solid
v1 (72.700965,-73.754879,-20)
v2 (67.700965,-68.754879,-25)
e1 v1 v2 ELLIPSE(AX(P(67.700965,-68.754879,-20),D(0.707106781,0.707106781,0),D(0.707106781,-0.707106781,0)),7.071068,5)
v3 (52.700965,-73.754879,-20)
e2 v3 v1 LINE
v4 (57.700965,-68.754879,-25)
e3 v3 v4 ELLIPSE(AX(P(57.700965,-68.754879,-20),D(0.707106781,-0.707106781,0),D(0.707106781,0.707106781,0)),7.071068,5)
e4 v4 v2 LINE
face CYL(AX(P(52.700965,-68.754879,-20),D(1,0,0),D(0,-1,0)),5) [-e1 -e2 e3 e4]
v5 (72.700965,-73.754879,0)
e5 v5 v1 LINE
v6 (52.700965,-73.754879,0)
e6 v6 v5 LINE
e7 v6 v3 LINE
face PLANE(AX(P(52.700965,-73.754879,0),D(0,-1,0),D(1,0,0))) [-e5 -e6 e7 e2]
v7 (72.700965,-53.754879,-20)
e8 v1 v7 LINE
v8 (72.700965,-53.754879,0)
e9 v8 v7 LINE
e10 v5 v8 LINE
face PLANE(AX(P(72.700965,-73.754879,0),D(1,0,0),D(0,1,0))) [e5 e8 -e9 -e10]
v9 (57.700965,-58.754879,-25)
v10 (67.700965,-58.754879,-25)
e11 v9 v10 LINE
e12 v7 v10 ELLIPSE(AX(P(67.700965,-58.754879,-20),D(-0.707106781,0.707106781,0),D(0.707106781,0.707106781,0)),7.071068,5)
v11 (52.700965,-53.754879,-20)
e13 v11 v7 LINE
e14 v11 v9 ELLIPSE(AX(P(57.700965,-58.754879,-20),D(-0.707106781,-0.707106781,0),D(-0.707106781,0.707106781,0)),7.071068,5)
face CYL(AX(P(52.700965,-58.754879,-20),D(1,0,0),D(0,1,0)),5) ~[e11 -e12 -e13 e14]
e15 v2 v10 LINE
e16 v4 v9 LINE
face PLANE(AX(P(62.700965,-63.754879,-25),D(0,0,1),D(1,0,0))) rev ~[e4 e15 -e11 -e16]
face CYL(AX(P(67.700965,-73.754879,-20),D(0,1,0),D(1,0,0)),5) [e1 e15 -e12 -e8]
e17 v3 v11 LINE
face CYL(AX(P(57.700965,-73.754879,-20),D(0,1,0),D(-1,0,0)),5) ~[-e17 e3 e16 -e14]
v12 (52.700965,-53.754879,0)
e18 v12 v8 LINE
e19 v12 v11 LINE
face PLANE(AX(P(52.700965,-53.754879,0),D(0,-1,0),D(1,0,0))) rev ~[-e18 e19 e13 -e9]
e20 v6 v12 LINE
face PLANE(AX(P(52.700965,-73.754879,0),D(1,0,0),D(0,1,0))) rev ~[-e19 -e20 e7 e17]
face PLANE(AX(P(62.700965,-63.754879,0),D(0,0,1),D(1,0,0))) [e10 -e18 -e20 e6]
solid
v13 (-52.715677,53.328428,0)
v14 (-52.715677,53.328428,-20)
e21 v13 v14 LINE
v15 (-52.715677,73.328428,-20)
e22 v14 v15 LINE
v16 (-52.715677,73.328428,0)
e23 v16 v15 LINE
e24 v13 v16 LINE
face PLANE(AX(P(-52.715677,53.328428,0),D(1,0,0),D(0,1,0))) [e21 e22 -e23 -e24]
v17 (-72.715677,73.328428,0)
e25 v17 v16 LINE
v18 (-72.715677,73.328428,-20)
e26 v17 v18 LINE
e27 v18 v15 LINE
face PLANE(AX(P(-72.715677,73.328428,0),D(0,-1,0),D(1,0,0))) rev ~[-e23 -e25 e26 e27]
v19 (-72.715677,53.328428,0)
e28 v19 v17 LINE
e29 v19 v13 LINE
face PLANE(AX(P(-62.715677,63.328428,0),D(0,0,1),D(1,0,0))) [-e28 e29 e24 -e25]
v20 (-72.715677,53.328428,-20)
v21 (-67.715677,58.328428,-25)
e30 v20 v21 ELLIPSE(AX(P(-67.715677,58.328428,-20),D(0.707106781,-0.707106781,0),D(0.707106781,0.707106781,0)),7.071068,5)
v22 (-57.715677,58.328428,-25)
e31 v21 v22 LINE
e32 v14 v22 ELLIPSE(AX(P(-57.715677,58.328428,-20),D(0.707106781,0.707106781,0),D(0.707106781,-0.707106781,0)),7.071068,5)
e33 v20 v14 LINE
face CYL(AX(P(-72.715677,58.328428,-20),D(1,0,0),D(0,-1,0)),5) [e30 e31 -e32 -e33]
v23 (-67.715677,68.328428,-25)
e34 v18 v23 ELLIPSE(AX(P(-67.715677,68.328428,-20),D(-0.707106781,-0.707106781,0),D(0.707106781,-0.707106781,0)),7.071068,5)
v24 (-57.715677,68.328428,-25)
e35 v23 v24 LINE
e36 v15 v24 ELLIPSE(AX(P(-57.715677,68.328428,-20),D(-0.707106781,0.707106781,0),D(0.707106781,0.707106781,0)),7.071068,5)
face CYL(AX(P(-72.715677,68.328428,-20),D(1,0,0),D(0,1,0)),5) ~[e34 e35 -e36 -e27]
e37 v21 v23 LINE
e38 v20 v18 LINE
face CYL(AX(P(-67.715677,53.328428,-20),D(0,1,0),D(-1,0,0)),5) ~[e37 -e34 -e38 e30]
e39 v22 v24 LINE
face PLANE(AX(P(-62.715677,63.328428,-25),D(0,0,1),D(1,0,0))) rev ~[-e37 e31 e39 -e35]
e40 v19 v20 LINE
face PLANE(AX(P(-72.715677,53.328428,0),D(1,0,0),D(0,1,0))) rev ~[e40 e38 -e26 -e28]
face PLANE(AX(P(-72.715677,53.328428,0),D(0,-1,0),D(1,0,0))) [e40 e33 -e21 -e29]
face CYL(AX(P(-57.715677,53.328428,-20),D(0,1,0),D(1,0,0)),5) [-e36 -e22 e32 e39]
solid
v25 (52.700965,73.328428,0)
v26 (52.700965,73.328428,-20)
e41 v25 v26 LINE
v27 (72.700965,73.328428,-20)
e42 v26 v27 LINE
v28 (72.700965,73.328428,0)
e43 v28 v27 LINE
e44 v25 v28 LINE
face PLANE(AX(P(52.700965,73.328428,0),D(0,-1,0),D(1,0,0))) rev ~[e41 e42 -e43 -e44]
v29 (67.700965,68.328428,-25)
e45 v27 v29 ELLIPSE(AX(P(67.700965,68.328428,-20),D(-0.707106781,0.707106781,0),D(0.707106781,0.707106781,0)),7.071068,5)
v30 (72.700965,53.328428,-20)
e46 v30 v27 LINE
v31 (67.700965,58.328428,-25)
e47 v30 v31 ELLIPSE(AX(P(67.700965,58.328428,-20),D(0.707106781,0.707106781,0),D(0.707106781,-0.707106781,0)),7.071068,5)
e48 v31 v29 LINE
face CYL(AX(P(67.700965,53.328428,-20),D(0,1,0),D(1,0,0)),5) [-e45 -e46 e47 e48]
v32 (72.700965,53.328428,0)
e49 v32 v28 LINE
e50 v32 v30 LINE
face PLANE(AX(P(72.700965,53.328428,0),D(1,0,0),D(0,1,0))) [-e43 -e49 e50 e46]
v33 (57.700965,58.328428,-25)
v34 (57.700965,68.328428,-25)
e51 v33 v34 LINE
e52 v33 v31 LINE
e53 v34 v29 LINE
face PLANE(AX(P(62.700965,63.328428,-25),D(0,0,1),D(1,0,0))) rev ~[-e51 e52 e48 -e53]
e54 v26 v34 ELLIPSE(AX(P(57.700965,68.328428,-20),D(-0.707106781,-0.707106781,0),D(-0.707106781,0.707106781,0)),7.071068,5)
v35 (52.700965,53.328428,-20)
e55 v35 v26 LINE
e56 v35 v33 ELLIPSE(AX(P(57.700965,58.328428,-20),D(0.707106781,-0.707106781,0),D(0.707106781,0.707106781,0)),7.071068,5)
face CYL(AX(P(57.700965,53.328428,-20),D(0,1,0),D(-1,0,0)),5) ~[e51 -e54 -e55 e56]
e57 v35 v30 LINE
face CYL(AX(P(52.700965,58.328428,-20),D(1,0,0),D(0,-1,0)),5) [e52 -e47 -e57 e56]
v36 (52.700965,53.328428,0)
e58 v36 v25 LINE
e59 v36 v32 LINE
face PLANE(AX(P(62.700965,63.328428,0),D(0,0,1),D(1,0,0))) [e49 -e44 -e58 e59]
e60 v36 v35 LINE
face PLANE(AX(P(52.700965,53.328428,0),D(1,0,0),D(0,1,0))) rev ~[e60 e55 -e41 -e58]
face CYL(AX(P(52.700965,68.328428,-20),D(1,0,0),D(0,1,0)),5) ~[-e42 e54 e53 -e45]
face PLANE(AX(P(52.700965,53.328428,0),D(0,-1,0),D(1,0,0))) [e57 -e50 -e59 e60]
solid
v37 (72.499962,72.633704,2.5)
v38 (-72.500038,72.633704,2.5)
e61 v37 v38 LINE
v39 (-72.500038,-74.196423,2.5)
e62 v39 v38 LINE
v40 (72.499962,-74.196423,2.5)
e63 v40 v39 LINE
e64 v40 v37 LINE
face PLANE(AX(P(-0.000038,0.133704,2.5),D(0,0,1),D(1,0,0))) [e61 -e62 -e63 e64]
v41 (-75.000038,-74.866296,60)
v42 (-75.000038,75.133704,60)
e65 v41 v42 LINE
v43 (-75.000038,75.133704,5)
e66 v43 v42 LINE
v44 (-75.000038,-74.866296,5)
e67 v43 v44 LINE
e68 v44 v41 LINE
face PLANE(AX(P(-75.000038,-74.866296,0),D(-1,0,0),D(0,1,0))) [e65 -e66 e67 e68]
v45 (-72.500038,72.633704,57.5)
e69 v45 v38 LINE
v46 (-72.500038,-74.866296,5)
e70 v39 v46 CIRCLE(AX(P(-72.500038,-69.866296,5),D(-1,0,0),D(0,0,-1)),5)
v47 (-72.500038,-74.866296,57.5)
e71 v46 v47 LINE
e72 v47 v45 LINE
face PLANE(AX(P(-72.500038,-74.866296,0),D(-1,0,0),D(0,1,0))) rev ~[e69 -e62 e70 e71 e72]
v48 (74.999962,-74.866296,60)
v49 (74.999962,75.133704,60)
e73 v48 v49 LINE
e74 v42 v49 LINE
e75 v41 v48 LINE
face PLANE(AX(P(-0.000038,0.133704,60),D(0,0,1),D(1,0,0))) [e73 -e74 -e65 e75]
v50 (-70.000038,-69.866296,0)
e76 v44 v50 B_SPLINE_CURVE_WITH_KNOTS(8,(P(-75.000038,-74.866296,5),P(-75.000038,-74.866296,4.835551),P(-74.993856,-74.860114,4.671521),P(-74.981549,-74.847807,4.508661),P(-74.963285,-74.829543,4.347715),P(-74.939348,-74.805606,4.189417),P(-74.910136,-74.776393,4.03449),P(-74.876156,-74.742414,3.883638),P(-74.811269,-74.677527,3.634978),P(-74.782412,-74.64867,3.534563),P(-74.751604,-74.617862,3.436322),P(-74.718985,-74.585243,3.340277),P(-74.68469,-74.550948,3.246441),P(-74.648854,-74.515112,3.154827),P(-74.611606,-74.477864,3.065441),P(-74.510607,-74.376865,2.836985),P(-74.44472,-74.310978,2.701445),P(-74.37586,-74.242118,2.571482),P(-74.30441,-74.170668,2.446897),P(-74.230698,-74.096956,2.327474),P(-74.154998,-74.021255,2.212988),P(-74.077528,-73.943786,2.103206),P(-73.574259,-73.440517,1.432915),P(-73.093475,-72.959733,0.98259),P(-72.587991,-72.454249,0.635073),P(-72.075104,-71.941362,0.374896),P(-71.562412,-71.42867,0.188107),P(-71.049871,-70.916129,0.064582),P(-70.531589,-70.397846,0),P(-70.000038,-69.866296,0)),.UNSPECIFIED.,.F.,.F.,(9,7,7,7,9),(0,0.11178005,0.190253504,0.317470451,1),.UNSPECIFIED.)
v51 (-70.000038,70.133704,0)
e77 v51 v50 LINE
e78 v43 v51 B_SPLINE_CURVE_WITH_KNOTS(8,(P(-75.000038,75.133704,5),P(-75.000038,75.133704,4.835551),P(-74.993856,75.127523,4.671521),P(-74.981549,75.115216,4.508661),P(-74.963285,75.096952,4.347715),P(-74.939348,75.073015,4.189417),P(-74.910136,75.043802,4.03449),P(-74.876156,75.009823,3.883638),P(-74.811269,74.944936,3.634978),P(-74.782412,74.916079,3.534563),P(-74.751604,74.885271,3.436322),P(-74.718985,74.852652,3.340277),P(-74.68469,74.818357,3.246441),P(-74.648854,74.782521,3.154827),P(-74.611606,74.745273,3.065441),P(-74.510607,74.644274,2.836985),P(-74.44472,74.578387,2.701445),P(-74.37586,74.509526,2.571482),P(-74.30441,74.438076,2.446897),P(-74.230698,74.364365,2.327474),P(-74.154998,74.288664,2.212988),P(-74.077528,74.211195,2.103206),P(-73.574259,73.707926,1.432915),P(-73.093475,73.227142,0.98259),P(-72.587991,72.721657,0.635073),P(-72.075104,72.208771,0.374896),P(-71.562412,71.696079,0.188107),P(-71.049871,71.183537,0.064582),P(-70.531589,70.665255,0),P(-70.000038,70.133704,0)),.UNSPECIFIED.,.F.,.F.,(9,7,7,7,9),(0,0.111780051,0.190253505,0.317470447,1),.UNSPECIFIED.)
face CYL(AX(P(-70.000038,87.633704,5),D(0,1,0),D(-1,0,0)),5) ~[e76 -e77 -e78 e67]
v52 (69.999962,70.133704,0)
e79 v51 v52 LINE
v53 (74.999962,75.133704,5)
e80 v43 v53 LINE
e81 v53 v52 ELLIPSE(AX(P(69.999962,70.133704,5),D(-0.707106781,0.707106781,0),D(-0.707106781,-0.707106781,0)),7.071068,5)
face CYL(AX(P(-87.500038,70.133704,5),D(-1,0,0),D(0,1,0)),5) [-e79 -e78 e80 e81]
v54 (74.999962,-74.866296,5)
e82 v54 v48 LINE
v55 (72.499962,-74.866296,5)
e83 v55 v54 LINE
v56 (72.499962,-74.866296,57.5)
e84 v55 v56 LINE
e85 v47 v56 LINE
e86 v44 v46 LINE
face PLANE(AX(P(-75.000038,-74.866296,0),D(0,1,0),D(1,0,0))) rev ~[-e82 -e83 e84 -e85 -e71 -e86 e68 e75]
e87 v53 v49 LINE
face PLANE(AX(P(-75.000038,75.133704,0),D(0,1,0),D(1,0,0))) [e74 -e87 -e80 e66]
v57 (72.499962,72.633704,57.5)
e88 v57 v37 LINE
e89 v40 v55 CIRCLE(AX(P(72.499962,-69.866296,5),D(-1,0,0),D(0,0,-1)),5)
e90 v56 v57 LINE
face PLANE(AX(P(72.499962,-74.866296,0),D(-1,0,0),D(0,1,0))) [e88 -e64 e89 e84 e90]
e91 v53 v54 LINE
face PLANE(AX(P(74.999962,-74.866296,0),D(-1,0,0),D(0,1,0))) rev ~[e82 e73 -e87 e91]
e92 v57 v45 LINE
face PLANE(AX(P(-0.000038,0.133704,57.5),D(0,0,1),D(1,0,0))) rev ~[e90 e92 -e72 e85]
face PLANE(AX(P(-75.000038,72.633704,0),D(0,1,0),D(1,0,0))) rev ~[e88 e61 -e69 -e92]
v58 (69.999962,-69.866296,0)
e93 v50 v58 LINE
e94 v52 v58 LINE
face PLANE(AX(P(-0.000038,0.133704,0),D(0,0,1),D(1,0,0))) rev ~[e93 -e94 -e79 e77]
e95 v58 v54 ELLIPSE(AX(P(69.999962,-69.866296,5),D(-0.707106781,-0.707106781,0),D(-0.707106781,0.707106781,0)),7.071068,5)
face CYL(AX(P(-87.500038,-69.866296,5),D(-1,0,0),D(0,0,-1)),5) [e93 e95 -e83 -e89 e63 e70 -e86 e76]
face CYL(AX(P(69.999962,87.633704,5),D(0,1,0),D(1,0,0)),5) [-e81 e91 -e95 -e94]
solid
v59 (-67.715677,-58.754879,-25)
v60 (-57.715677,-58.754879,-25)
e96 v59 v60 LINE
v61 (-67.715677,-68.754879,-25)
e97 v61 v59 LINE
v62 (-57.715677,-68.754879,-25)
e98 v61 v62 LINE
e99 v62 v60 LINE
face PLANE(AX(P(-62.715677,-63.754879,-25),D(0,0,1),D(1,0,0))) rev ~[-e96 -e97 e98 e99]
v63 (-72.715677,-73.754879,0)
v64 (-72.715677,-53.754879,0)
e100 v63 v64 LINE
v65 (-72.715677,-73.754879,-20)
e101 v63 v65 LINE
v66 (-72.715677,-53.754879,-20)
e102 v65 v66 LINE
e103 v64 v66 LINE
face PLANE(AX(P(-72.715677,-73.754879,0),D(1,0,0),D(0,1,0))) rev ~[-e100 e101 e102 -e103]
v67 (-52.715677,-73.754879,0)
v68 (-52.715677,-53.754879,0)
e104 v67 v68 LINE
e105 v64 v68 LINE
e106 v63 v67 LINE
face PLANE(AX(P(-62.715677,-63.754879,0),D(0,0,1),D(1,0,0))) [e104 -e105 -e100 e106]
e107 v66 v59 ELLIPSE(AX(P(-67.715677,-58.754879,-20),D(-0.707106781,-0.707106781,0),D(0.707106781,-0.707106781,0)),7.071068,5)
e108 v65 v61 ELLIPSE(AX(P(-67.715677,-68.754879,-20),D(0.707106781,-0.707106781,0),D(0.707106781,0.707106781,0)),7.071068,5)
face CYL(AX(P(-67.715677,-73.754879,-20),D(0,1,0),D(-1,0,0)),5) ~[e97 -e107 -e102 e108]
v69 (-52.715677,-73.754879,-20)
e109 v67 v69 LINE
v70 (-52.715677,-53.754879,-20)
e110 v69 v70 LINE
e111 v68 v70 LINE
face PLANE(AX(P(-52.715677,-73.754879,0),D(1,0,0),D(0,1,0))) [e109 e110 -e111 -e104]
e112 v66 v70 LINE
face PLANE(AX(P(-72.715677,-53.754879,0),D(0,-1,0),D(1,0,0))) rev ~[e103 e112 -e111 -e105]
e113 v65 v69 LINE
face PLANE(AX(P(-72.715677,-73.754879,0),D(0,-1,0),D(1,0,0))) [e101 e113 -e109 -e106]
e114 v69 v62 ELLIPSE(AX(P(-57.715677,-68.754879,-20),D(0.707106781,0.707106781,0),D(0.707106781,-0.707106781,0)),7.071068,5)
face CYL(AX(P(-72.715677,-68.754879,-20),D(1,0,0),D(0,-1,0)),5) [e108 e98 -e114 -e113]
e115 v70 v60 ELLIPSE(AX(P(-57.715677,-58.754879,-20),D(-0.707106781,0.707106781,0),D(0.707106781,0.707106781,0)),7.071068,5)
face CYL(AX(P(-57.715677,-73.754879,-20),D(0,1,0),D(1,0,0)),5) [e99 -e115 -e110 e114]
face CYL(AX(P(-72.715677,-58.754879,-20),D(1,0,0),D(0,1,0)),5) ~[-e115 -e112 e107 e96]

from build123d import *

# Parameters (mm, degrees)
F0_W        = 20
F0_H        = 20
F1_DEPTH    = 25
F2_W        = 150
F2_H        = 150
F3_DEPTH    = 60
F4_T        = -2.5
F5_R        = 5
F5_2_R      = 5
F5_3_R      = 5
F5_4_R      = 5
F6_T1_DEPTH = 175
F6_T3_DEPTH = 175


# Not quite as in the source:
# - a fillet or chamfer that OpenCascade refuses, or shapes differently, is made with other operations: its cross-section is extruded or revolved along the edge and cut away or added


with BuildPart() as f1:
    # F0 (on Top) → F1 (new body)
    with BuildSketch(Plane.XY):
        with Locations((-62.7156771406, 63.3284281388)):
            Rectangle(F0_W, F0_H)
    extrude(amount=-F1_DEPTH)

    # F5#4
    f5_4_edges = [f1.edges().sort_by_distance(p)[0] for p in [
        (-62.715677, 73.328428, -25),
        (-72.715677, 63.328428, -25),
        (-62.715677, 53.328428, -25),
        (-52.715677, 63.328428, -25),
    ]]
    fillet(f5_4_edges, radius=F5_4_R)


with BuildPart() as f1b:
    # F0 (on Top) → F1, piece 2 (new body)
    with BuildSketch(Plane.XY):
        with Locations((-62.7156771406, -63.7548786509)):
            Rectangle(F0_W, F0_H)
    extrude(amount=-F1_DEPTH)

    # F5
    f5_edges = [f1b.edges().sort_by_distance(p)[0] for p in [
        (-62.715677, -53.754879, -25),
        (-72.715677, -63.754879, -25),
        (-62.715677, -73.754879, -25),
        (-52.715677, -63.754879, -25),
    ]]
    fillet(f5_edges, radius=F5_R)


with BuildPart() as f1c:
    # F0 (on Top) → F1, piece 3 (new body)
    with BuildSketch(Plane.XY):
        with Locations((62.7009654807, 63.3284281388)):
            Rectangle(F0_W, F0_H)
    extrude(amount=-F1_DEPTH)

    # F5#3
    f5_3_edges = [f1c.edges().sort_by_distance(p)[0] for p in [
        (52.700965, 63.328428, -25),
        (62.700965, 53.328428, -25),
        (72.700965, 63.328428, -25),
        (62.700965, 73.328428, -25),
    ]]
    fillet(f5_3_edges, radius=F5_3_R)


with BuildPart() as f1d:
    # F0 (on Top) → F1, piece 4 (new body)
    with BuildSketch(Plane.XY):
        with Locations((62.7009654807, -63.7548786509)):
            Rectangle(F0_W, F0_H)
    extrude(amount=-F1_DEPTH)

    # F5#2
    f5_2_edges = [f1d.edges().sort_by_distance(p)[0] for p in [
        (52.700965, -63.754879, -25),
        (62.700965, -73.754879, -25),
        (72.700965, -63.754879, -25),
        (62.700965, -53.754879, -25),
    ]]
    fillet(f5_2_edges, radius=F5_2_R)


with BuildPart() as f3:
    # F2 (on Top) → F3 (new body)
    with BuildSketch(Plane.XY):
        with Locations((-3.77863e-05, 0.1337043941)):
            Rectangle(F2_W, F2_H)
    extrude(amount=F3_DEPTH)

    # F4
    f4_openings = [f3.faces().sort_by_distance(p)[0] for p in [
        (-3.8e-05, -74.866296, 30),
    ]]
    offset(amount=F4_T, openings=f4_openings)

    # F6: fillet of radius 5 on 4 edges, made by hand

    # F6_s2 → F6_t1 (cut)
    with BuildSketch(Plane.YZ.offset(-87.5000377863)):
        with BuildLine():
            ThreePointArc((75.1337043941, 5), (73.6692383, 1.4644660941), (70.1337043941, 0))
            Line((70.1337043941, 0), (75.1337043941, 0))
            Line((75.1337043941, 0), (75.1337043941, 5))
        make_face()
        with BuildLine():
            ThreePointArc((-69.8662956059, 0), (-73.4018295118, 1.4644660941), (-74.8662956059, 5))
            Line((-74.8662956059, 5), (-74.8662956059, 0))
            Line((-74.8662956059, 0), (-69.8662956059, 0))
        make_face()
    extrude(amount=F6_T1_DEPTH, mode=Mode.SUBTRACT)

    # F6_s4 → F6_t3 (cut)
    with BuildSketch(Plane.XZ.offset(-87.6337043941)):
        with BuildLine():
            ThreePointArc((-75.0000377863, 5), (-73.5355716923, 1.4644660941), (-70.0000377863, 0))
            Line((-70.0000377863, 0), (-75.0000377863, 0))
            Line((-75.0000377863, 0), (-75.0000377863, 5))
        make_face()
        with BuildLine():
            ThreePointArc((74.9999622137, 5), (73.5354961196, 1.4644660941), (69.9999622137, 0))
            Line((69.9999622137, 0), (74.9999622137, 0))
            Line((74.9999622137, 0), (74.9999622137, 5))
        make_face()
    extrude(amount=F6_T3_DEPTH, mode=Mode.SUBTRACT)


solid = Compound([f1.part, f1b.part, f1c.part, f1d.part, f3.part])
